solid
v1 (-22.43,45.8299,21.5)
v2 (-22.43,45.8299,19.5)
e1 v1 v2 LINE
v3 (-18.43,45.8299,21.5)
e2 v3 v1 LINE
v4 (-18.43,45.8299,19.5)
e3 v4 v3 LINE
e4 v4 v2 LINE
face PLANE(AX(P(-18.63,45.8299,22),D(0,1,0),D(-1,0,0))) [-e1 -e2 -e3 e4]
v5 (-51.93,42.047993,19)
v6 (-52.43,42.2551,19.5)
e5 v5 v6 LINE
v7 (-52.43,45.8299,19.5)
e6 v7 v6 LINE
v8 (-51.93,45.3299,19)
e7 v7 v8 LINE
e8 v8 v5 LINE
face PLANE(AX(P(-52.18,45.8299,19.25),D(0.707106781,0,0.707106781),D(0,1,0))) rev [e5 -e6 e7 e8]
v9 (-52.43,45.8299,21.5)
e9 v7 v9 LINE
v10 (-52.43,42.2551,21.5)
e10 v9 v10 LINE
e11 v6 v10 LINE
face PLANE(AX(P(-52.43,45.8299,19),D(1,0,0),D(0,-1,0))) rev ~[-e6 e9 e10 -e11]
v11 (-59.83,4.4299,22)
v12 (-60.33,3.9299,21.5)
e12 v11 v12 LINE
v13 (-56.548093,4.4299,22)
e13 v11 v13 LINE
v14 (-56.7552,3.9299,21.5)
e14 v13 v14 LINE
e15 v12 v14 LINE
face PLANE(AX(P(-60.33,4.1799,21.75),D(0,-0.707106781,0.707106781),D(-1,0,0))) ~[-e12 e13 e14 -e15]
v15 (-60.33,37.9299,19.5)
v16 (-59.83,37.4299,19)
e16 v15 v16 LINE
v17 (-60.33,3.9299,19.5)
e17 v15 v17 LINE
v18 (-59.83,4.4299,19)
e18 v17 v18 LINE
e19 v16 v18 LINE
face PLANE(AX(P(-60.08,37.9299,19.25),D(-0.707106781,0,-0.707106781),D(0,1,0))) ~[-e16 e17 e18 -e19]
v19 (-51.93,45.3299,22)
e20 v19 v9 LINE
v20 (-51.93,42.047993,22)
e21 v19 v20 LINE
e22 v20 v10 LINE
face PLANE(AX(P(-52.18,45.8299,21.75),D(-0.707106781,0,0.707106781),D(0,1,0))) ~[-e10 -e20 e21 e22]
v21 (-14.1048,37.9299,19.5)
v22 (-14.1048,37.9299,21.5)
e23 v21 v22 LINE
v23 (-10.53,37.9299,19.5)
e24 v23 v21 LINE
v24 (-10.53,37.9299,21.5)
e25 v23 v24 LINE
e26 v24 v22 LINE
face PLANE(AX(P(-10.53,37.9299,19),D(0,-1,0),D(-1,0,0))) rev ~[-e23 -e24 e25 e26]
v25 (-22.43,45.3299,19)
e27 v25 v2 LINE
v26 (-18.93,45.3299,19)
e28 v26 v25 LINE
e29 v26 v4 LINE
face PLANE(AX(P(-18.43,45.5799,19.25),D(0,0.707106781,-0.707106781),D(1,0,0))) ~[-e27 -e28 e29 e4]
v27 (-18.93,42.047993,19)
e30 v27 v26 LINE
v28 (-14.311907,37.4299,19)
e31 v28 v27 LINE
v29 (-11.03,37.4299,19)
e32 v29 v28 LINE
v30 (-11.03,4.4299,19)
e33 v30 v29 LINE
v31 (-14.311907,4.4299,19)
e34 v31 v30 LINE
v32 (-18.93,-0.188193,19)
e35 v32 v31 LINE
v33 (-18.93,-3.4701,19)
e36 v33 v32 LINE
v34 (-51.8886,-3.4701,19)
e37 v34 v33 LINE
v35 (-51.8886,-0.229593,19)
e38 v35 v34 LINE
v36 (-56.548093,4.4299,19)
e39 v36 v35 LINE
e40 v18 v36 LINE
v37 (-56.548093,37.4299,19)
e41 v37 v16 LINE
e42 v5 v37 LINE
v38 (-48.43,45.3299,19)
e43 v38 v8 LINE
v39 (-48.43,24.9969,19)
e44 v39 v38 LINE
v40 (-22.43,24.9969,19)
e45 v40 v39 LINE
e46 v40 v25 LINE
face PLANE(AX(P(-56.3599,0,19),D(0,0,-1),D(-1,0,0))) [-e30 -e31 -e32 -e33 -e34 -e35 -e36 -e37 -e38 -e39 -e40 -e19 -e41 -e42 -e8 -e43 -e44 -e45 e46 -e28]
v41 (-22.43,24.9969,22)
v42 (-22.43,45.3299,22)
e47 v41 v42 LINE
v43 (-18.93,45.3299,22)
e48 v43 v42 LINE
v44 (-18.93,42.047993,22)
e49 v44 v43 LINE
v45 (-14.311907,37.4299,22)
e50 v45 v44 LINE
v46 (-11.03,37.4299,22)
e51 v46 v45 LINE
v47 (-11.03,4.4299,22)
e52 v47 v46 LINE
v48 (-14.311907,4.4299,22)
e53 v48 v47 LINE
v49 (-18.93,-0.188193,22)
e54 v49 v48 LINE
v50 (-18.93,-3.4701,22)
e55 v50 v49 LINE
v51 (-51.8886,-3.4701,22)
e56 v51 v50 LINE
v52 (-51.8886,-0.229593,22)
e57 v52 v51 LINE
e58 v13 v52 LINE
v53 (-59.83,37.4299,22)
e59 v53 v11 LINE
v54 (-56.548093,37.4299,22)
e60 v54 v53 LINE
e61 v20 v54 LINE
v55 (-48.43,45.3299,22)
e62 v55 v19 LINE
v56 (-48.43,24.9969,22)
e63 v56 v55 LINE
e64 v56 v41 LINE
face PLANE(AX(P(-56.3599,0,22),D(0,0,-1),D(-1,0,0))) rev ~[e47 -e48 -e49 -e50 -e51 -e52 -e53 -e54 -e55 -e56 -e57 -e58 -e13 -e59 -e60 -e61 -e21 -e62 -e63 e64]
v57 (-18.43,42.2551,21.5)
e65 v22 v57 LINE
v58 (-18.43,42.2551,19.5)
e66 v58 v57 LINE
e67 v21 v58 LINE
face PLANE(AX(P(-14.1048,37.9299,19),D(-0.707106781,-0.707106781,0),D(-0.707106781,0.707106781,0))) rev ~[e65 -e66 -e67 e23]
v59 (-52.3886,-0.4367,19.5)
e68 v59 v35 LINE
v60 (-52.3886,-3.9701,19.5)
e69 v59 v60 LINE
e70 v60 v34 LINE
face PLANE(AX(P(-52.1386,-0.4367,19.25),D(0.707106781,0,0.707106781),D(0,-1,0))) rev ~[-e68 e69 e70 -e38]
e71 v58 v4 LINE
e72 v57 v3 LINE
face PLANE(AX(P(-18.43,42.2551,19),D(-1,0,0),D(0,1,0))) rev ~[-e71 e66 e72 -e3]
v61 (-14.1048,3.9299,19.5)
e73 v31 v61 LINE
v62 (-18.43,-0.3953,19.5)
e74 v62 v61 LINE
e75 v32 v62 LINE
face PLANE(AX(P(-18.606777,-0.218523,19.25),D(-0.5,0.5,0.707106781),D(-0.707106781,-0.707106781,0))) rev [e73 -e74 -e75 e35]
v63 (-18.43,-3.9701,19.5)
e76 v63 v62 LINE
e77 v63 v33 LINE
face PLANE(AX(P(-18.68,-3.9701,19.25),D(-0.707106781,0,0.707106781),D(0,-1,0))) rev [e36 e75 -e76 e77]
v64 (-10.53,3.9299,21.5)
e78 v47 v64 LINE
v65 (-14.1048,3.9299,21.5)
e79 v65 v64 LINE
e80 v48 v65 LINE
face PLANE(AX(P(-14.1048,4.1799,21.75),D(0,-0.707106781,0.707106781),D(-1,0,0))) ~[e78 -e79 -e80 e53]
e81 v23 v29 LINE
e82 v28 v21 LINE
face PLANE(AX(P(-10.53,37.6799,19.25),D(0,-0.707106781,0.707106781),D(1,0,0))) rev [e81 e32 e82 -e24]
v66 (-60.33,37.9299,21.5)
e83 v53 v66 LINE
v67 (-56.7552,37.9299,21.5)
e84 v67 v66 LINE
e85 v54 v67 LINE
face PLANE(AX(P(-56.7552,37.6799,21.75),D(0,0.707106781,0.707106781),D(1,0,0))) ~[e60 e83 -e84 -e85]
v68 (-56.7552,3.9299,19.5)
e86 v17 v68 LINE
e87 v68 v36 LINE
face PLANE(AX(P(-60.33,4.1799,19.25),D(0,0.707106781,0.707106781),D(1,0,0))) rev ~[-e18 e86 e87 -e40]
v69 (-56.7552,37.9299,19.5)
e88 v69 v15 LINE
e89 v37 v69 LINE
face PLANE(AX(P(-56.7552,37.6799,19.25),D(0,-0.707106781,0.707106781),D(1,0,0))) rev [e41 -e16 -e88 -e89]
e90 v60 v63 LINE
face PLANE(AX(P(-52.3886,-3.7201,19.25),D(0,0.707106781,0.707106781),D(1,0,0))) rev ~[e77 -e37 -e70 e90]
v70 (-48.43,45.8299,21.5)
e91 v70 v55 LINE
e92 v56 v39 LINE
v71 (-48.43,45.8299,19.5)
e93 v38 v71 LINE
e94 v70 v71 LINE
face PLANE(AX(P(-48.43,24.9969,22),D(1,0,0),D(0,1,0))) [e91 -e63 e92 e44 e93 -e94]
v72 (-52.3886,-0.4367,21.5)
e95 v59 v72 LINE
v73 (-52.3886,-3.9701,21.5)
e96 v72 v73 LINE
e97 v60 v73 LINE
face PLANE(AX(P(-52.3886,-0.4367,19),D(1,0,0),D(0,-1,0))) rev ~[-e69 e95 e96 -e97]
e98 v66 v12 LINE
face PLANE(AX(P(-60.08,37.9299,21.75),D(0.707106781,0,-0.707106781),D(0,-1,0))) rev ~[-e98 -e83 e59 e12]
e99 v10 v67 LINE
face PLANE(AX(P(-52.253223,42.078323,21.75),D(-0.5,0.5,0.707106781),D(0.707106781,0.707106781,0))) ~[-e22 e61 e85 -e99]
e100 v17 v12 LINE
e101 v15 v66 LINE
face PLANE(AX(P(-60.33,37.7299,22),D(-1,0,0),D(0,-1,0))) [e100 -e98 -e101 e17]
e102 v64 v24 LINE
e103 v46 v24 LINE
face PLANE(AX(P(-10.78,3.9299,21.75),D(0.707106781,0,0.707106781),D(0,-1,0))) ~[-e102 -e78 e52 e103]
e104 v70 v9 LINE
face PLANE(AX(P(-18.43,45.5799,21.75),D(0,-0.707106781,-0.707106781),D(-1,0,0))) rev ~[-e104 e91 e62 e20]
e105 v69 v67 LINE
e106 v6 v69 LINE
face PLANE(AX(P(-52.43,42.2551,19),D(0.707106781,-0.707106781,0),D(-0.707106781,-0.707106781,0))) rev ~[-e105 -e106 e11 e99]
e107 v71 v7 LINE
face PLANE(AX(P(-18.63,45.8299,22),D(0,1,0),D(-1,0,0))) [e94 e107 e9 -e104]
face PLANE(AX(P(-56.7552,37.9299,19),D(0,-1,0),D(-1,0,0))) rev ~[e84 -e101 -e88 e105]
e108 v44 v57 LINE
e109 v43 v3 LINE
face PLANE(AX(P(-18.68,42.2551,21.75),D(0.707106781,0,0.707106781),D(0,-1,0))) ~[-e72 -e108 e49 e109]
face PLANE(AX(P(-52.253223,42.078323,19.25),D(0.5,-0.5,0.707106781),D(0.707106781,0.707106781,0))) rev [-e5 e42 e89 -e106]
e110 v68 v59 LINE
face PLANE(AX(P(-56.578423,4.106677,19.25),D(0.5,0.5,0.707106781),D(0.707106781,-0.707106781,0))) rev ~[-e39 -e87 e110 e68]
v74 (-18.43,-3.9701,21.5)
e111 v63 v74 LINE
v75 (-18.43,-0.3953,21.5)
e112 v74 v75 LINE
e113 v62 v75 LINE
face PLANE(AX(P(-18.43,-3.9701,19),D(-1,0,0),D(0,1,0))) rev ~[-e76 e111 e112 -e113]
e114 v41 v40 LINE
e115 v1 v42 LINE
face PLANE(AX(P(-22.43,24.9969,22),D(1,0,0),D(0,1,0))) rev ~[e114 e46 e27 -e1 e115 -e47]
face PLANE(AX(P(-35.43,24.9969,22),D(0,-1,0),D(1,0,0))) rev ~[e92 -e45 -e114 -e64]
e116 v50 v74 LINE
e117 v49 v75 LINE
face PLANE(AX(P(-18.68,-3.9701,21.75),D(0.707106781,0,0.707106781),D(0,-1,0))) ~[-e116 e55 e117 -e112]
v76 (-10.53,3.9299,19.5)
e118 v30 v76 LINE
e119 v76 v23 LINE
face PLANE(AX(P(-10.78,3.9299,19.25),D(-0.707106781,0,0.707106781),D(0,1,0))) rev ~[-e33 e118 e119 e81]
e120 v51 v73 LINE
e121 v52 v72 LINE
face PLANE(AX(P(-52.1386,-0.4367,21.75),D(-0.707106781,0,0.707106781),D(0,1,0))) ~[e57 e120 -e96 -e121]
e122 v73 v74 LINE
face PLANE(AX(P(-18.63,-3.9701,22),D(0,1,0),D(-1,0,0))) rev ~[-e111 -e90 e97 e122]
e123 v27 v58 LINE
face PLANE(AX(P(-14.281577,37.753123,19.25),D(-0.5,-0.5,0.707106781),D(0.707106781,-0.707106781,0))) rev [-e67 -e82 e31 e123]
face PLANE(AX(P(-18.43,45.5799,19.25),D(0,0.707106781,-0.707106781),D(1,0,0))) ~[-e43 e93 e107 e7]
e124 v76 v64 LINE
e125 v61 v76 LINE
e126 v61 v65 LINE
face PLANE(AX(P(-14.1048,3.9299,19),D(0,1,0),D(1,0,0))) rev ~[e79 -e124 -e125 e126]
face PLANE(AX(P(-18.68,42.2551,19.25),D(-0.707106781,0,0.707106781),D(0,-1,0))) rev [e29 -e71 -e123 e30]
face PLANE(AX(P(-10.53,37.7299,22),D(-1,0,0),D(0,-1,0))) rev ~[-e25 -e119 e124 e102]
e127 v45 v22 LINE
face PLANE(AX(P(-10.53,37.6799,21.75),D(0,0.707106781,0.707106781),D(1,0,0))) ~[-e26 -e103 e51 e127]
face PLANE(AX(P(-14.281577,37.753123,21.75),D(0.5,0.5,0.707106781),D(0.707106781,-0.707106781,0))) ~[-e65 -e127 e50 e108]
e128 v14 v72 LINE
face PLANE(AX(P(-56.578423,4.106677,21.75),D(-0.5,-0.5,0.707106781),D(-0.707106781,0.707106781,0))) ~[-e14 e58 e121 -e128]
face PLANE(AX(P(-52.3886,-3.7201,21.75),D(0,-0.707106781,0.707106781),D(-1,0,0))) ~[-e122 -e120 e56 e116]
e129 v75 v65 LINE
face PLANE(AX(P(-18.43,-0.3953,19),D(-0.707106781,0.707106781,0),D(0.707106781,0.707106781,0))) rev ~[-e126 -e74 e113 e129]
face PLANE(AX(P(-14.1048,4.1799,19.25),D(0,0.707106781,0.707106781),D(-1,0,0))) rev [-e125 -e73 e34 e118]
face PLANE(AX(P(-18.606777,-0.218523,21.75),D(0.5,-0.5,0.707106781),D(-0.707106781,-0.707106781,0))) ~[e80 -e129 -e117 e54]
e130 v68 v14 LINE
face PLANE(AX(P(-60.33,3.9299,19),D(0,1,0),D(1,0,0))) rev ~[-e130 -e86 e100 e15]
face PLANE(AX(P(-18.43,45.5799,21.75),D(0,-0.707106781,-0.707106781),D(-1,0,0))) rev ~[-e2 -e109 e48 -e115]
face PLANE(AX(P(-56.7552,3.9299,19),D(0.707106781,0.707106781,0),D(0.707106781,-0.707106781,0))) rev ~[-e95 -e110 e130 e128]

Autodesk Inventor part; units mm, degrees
ref_plane "YZ Plane" through (0, 0, 0) normal (1, 0, 0) x (0, 1, 0)
ref_plane "XZ Plane" through (0, 0, 0) normal (0, 1, 0) x (-1, 0, 0)
ref_plane "Work Plane1" through (-56.3599, 0, 22) normal (0, 0, -1) x (-1, 0, 0)
sketch "Sketch1" plane through (-56.3599, 0, 22) normal (0, 0, -1) x (-1, 0, 0)
  line L0 (-4.0299, -0.3538) -> (-2.2322, 1.4439) construction
  arc A0 (-1.4439, 2.2322) -> (-2.2322, 1.4439) centre (-0.9299, 0.9299) ccw construction
  line L1 (-1.4439, 2.2322) -> (0.3538, 4.0299) construction
  line L2 (-37.8299, 42.8299) -> (-37.8299, 37.8299) construction
  line L3 (-37.8299, 37.8299) -> (-42.9208, 37.8299) construction
  line L4 (-37.8299, 42.2137) -> (-37.8299, 45.8299) construction
  line L5 (-37.8299, 45.8299) -> (-4.0299, 45.8299) construction
  line L6 (-4.0299, 45.8299) -> (-4.0299, 42.2137) construction
  line L7 (-4.0299, 4.0299) -> (0.3538, 4.0299) projected
  circle A1 centre (-20.9299, 20.9299) radius 17.5 projected
  line L8 (-20.9299, 58.9723) -> (17.1124, 20.9299) construction
  line L9 (17.1124, 20.9299) -> (-20.9299, -17.1124) construction
  line L10 (-20.9299, -17.1124) -> (-58.9723, 20.9299) construction
  line L11 (-58.9723, 20.9299) -> (-20.9299, 58.9723) construction
  line L12 (-20.9299, 58.9723) -> (-20.9299, -17.1124) construction
  line L13 (17.1124, 20.9299) -> (-58.9723, 20.9299) construction
  line L14 (-20.9299, 58.9723) -> (32.8701, 58.9723) construction
  line L15 (-43.4299, 43.4299) -> (1.5701, 43.4299) construction
  line L16 (1.5701, 43.4299) -> (1.5701, -1.5701) construction
  line L17 (1.5701, -1.5701) -> (-43.4299, -1.5701) construction
  line L18 (-43.4299, -1.5701) -> (-43.4299, 43.4299) construction
  line L19 (-43.4299, 43.4299) -> (1.5701, -1.5701) construction
  line L20 (1.5701, 43.4299) -> (-43.4299, -1.5701) construction
  line L21 (-43.4299, 5.3876) -> (-43.4299, 36.4723)
  line L22 (-43.4299, 36.4723) -> (-36.4723, 43.4299)
  line L23 (-36.4723, 43.4299) -> (-5.3876, 43.4299)
  line L24 (-5.3876, 43.4299) -> (1.5701, 36.4723)
  line L25 (1.5701, 36.4723) -> (1.5701, 5.3876)
  line L26 (1.5701, 5.3876) -> (-5.3876, -1.5701)
  line L27 (-5.3876, -1.5701) -> (-36.4723, -1.5701)
  line L28 (-36.4723, -1.5701) -> (-43.4299, 5.3876)
  line L29 (-4.0299, 42.2137) -> (-37.8299, 42.2137) projected
  line L30 (-4.0299, -0.3538) -> (-4.0299, 4.0299) projected
  circle A2 centre (-20.9299, 20.9299) radius 1.5
  line L31 (-10.9299, 10.9299) -> (-30.9299, 10.9299) construction
  line L32 (-30.9299, 10.9299) -> (-30.9299, 30.9299) construction
  line L33 (-30.9299, 30.9299) -> (-10.9299, 30.9299) construction
  line L34 (-10.9299, 30.9299) -> (-10.9299, 10.9299) construction
  line L35 (-10.9299, 10.9299) -> (-30.9299, 30.9299) construction
  line L36 (-30.9299, 10.9299) -> (-10.9299, 30.9299) construction
  circle A3 centre (-30.9299, 30.9299) radius 1.4
  circle A4 centre (-30.9299, 10.9299) radius 1.4
  circle A5 centre (-10.9299, 10.9299) radius 1.4
  line L37 (-45.8299, 37.8299) -> (-42.0723, 37.8299) construction
  line L38 (-42.1723, 37.7299) -> (-45.8299, 37.7299)
  line L39 (-45.8299, 37.7299) -> (-45.8299, 4.1299)
  line L40 (-45.8299, 4.1299) -> (-42.1723, 4.1299)
  line L41 (-42.1723, 4.1299) -> (-42.1723, 37.7299)
  line L42 (-45.8299, 4.0299) -> (-42.0723, 4.0299) construction
  line L43 (-45.8299, 37.8299) -> (-42.0723, 37.8299) projected
  line L44 (-37.7299, 45.8299) -> (-4.1299, 45.8299)
  line L45 (-4.1299, 45.8299) -> (-4.1299, 42.1723)
  line L46 (-4.1299, 42.1723) -> (-37.7299, 42.1723)
  line L47 (-37.7299, 42.1723) -> (-37.7299, 45.8299)
  line L48 (0.4701, 37.8299) -> (0.4701, 4.0299) construction
  line L49 (0.4701, 4.0299) -> (3.9701, 4.0299) construction
  line L50 (3.9701, 37.8299) -> (3.9701, 4.0299) construction
  line L51 (0.4701, 37.8299) -> (3.9701, 37.8299) construction
  line L52 (-45.8299, -3.9701) -> (-4.0299, -3.9701) construction
  line L53 (0.3124, 37.7299) -> (3.9701, 37.7299)
  line L54 (3.9701, 37.7299) -> (3.9701, 4.1299)
  line L55 (3.9701, 4.1299) -> (0.3124, 4.1299)
  line L56 (0.3124, 4.1299) -> (0.3124, 37.7299)
  line L57 (-4.1713, -0.3538) -> (-37.7299, -0.3538)
  line L58 (-37.7299, -0.3538) -> (-37.7299, -3.9701)
  line L59 (-37.7299, -3.9701) -> (-4.1713, -3.9701)
  line L60 (-4.1713, -3.9701) -> (-4.1713, -0.3538)
  point P0 (-37.8299, 4.0299)
  dimension "d18" = 53.8
  dimension "d19" = 45
  dimension "d20" = 53.8
  dimension "d21" = 45
  dimension "d22" = 45
  dimension "d30" = 20
  dimension "d31" = 20
  dimension "d32" = 2.8
  dimension "d33" = 2.8
  dimension "d34" = 2.8
  dimension "d35" = 3
  dimension "d36" = 0.1
  dimension "d37" = 0.1
  dimension "d38" = 0.1
  dimension "d39" = 0.1
extrude "Extrusion1" add sketch "Sketch1" along normal blind 3 contours L30 L26 L57 L28 L41 L22 L46 L24 L56 L7 | L7 L26 L30 | L56 L24 L25 L26 | L26 L25 L24 L53 L54 L55 | L60 L59 L58 L57 L28 L27 L26 | L26 L27 L28 L57 | L46 L22 L29 L24 | L24 L29 L45 | L40 L39 L38 L22 L21 L28 | L28 L21 L22 L41 | L29 L22 L23 L24 | L24 L23 L22 L29 L47 L44 L45 | L47 L29 L22 | A1 | A2 | A3 | A4 | A5
sketch "Skizze4" plane through (-56.3599, 0, 19) normal (0, 0, -1) x (-1, 0, 0)
  line L0 (-37.7299, 42.1723) -> (-42.1723, 37.7299) projected
  line L1 (-42.1723, 37.7299) -> (-45.8299, 37.7299) projected
  line L2 (-45.8299, 37.7299) -> (-45.8299, 4.1299) construction
  line L3 (-45.8299, 4.1299) -> (-42.1723, 4.1299) projected
  line L4 (-42.1723, 4.1299) -> (-37.6885, -0.3538) projected
  line L5 (-37.6885, -0.3538) -> (-37.7299, -0.3538) projected
  line L6 (-37.7299, -0.3538) -> (-37.7299, -3.9701) projected
  line L7 (-37.7299, -3.9701) -> (-4.1713, -3.9701) construction
  line L8 (-4.1713, -3.9701) -> (-4.1713, -0.3538) projected
  line L9 (-4.1713, -0.3538) -> (0.3124, 4.1299) projected
  line L10 (0.3124, 4.1299) -> (3.9701, 4.1299) projected
  line L11 (3.9701, 4.1299) -> (3.9701, 37.7299) construction
  line L12 (3.9701, 37.7299) -> (0.3124, 37.7299) projected
  line L13 (0.3124, 37.7299) -> (-4.1299, 42.1723) projected
  line L14 (-4.1299, 42.1723) -> (-4.1299, 45.8299) projected
  line L15 (-4.1299, 45.8299) -> (-37.7299, 45.8299) construction
  line L16 (-37.7299, 45.8299) -> (-37.7299, 42.1723) projected
  line L17 (-37.9299, 46.0299) -> (-3.9299, 46.0299) construction
  line L18 (-3.9299, 46.0299) -> (-3.9299, 42.2551)
  line L19 (-3.9299, 42.2551) -> (0.3953, 37.9299)
  line L20 (0.3953, 37.9299) -> (4.1701, 37.9299)
  line L21 (4.1701, 37.9299) -> (4.1701, 3.9299) construction
  line L22 (4.1701, 3.9299) -> (0.3953, 3.9299)
  line L23 (0.3953, 3.9299) -> (-3.9713, -0.4367)
  line L24 (-3.9713, -0.4367) -> (-3.9713, -4.1701)
  line L25 (-3.9713, -4.1701) -> (-37.9299, -4.1701) construction
  line L26 (-37.9299, -4.1701) -> (-37.9299, -0.3953)
  line L27 (-37.9299, -0.3953) -> (-42.2551, 3.9299)
  line L28 (-42.2551, 3.9299) -> (-46.0299, 3.9299)
  line L29 (-46.0299, 3.9299) -> (-46.0299, 37.9299) construction
  line L30 (-46.0299, 37.9299) -> (-42.2551, 37.9299)
  line L31 (-42.2551, 37.9299) -> (-37.9299, 42.2551)
  line L32 (-37.9299, 42.2551) -> (-37.9299, 46.0299)
  line L33 (-45.8299, 37.7299) -> (-45.8299, 37.9299)
  line L34 (-4.1299, 45.8299) -> (-37.7299, 45.8299) projected
  line L35 (-37.7299, 45.8299) -> (-37.9299, 45.8299)
  line L36 (-4.1299, 45.8299) -> (-3.9299, 45.8299)
  line L37 (3.9701, 37.7299) -> (3.9701, 37.9299)
  line L38 (3.9701, 4.1299) -> (3.9701, 37.7299) projected
  line L39 (3.9701, 4.1299) -> (3.9701, 3.9299)
  line L40 (-4.1713, -3.9701) -> (-3.9713, -3.9701)
  line L41 (-37.7299, -3.9701) -> (-37.9299, -3.9701)
  line L42 (-45.8299, 4.1299) -> (-45.8299, 3.9299)
  point P0 (-56.3599, 0)
  dimension "d40" = 0.2
extrude "IM_offset" add sketch "Skizze4" against normal up to surface (3 mm away)
ref_plane "Arbeitsebene5" through (-35.4299, 3.9299, 22) normal (-1, 0, 0) x (0, 0, 1)
ref_plane "Arbeitsebene6" through (-18.4299, 20.9299, 22) normal (0, 1, 0) x (-1, 0, 0)
chamfer "Fase2" distance 0.5 angle 45 32 edges at (-35.4299, 45.8299, 22) (-18.4299, 44.0425, 22) (-16.2673, 40.0925, 22) (-12.3173, 37.9299, 22) (-10.5299, 20.9299, 22) (-12.3173, 3.9299, 22) (-16.2673, 1.7673, 22) (-18.4299, -2.1827, 22) (-35.4092, -3.9701, 22) (-52.3885, -2.2034, 22) (-54.5718, 1.7466, 22) (-58.5425, 3.9299, 22) (-60.3299, 20.9299, 22) (-58.5425, 37.9299, 22) (-54.5925, 40.0925, 22) (-54.5718, 1.7466, 19) (-58.5425, 3.9299, 19) (-60.3299, 20.9299, 19) (-52.3885, -2.2034, 19) (-35.4092, -3.9701, 19) (-18.4299, -2.1827, 19) (-16.2673, 1.7673, 19) (-12.3173, 3.9299, 19) (-10.5299, 20.9299, 19) (-12.3173, 37.9299, 19) (-16.2673, 40.0925, 19) (-18.4299, 44.0425, 19) (-35.4299, 45.8299, 19) (-52.4299, 44.0425, 19) (-54.5925, 40.0925, 19) (-58.5425, 37.9299, 19) (-52.4299, 44.0425, 22)
sketch "Skizze33" plane through (-56.3599, 0, 22) normal (0, 0, 1) x (1, 0, 0)
  line L0 (35.9299, 55.1649) -> (35.9299, -0.2255) projected
  line L1 (35.9299, 55.1649) -> (20.9299, 55.1649) projected
  line L2 (20.9299, 55.1649) -> (20.9299, 47.7466) projected
  line L3 (33.9299, 47.7466) -> (20.9299, 47.7466) projected
  line L4 (33.9299, 24.9969) -> (33.9299, 47.7466) projected
  line L5 (20.9299, 24.9969) -> (33.9299, 24.9969) projected
  line L6 (20.9299, 24.9969) -> (20.9299, 20.7437) projected
  line L7 (22.9299, 20.7437) -> (20.9299, 20.7437) projected
  line L8 (22.9299, 17.3807) -> (22.9299, 20.7437) projected
  line L9 (20.9299, 17.3807) -> (22.9299, 17.3807) projected
  line L10 (20.9299, 17.3807) -> (20.9299, -0.2255) projected
  line L11 (35.9299, -0.2255) -> (20.9299, -0.2255) projected
  line L12 (20.9299, 24.9969) -> (33.9299, 24.9969)
  line L13 (33.9299, 24.9969) -> (33.9299, 47.7466)
  line L14 (33.9299, 47.7466) -> (20.9299, 47.7466)
  line L15 (20.9299, 47.7466) -> (20.9299, 24.9969)
  line L16 (20.9299, 24.9969) -> (7.9299, 24.9969)
  line L17 (7.9299, 24.9969) -> (7.9299, 47.7466)
  line L18 (7.9299, 47.7466) -> (20.9299, 47.7466)
  line L19 (20.9299, 47.7466) -> (20.9299, 24.9969)
  point P0 (56.3599, 0)
  dimension "d189" = 13
extrude "Extrusion28" cut sketch "Skizze33" against normal blind 3 contours L3 L4 L5 L15 | L15 L16 L17 L18
properties part number "20_Cube_Insert_Filter_25mm"
